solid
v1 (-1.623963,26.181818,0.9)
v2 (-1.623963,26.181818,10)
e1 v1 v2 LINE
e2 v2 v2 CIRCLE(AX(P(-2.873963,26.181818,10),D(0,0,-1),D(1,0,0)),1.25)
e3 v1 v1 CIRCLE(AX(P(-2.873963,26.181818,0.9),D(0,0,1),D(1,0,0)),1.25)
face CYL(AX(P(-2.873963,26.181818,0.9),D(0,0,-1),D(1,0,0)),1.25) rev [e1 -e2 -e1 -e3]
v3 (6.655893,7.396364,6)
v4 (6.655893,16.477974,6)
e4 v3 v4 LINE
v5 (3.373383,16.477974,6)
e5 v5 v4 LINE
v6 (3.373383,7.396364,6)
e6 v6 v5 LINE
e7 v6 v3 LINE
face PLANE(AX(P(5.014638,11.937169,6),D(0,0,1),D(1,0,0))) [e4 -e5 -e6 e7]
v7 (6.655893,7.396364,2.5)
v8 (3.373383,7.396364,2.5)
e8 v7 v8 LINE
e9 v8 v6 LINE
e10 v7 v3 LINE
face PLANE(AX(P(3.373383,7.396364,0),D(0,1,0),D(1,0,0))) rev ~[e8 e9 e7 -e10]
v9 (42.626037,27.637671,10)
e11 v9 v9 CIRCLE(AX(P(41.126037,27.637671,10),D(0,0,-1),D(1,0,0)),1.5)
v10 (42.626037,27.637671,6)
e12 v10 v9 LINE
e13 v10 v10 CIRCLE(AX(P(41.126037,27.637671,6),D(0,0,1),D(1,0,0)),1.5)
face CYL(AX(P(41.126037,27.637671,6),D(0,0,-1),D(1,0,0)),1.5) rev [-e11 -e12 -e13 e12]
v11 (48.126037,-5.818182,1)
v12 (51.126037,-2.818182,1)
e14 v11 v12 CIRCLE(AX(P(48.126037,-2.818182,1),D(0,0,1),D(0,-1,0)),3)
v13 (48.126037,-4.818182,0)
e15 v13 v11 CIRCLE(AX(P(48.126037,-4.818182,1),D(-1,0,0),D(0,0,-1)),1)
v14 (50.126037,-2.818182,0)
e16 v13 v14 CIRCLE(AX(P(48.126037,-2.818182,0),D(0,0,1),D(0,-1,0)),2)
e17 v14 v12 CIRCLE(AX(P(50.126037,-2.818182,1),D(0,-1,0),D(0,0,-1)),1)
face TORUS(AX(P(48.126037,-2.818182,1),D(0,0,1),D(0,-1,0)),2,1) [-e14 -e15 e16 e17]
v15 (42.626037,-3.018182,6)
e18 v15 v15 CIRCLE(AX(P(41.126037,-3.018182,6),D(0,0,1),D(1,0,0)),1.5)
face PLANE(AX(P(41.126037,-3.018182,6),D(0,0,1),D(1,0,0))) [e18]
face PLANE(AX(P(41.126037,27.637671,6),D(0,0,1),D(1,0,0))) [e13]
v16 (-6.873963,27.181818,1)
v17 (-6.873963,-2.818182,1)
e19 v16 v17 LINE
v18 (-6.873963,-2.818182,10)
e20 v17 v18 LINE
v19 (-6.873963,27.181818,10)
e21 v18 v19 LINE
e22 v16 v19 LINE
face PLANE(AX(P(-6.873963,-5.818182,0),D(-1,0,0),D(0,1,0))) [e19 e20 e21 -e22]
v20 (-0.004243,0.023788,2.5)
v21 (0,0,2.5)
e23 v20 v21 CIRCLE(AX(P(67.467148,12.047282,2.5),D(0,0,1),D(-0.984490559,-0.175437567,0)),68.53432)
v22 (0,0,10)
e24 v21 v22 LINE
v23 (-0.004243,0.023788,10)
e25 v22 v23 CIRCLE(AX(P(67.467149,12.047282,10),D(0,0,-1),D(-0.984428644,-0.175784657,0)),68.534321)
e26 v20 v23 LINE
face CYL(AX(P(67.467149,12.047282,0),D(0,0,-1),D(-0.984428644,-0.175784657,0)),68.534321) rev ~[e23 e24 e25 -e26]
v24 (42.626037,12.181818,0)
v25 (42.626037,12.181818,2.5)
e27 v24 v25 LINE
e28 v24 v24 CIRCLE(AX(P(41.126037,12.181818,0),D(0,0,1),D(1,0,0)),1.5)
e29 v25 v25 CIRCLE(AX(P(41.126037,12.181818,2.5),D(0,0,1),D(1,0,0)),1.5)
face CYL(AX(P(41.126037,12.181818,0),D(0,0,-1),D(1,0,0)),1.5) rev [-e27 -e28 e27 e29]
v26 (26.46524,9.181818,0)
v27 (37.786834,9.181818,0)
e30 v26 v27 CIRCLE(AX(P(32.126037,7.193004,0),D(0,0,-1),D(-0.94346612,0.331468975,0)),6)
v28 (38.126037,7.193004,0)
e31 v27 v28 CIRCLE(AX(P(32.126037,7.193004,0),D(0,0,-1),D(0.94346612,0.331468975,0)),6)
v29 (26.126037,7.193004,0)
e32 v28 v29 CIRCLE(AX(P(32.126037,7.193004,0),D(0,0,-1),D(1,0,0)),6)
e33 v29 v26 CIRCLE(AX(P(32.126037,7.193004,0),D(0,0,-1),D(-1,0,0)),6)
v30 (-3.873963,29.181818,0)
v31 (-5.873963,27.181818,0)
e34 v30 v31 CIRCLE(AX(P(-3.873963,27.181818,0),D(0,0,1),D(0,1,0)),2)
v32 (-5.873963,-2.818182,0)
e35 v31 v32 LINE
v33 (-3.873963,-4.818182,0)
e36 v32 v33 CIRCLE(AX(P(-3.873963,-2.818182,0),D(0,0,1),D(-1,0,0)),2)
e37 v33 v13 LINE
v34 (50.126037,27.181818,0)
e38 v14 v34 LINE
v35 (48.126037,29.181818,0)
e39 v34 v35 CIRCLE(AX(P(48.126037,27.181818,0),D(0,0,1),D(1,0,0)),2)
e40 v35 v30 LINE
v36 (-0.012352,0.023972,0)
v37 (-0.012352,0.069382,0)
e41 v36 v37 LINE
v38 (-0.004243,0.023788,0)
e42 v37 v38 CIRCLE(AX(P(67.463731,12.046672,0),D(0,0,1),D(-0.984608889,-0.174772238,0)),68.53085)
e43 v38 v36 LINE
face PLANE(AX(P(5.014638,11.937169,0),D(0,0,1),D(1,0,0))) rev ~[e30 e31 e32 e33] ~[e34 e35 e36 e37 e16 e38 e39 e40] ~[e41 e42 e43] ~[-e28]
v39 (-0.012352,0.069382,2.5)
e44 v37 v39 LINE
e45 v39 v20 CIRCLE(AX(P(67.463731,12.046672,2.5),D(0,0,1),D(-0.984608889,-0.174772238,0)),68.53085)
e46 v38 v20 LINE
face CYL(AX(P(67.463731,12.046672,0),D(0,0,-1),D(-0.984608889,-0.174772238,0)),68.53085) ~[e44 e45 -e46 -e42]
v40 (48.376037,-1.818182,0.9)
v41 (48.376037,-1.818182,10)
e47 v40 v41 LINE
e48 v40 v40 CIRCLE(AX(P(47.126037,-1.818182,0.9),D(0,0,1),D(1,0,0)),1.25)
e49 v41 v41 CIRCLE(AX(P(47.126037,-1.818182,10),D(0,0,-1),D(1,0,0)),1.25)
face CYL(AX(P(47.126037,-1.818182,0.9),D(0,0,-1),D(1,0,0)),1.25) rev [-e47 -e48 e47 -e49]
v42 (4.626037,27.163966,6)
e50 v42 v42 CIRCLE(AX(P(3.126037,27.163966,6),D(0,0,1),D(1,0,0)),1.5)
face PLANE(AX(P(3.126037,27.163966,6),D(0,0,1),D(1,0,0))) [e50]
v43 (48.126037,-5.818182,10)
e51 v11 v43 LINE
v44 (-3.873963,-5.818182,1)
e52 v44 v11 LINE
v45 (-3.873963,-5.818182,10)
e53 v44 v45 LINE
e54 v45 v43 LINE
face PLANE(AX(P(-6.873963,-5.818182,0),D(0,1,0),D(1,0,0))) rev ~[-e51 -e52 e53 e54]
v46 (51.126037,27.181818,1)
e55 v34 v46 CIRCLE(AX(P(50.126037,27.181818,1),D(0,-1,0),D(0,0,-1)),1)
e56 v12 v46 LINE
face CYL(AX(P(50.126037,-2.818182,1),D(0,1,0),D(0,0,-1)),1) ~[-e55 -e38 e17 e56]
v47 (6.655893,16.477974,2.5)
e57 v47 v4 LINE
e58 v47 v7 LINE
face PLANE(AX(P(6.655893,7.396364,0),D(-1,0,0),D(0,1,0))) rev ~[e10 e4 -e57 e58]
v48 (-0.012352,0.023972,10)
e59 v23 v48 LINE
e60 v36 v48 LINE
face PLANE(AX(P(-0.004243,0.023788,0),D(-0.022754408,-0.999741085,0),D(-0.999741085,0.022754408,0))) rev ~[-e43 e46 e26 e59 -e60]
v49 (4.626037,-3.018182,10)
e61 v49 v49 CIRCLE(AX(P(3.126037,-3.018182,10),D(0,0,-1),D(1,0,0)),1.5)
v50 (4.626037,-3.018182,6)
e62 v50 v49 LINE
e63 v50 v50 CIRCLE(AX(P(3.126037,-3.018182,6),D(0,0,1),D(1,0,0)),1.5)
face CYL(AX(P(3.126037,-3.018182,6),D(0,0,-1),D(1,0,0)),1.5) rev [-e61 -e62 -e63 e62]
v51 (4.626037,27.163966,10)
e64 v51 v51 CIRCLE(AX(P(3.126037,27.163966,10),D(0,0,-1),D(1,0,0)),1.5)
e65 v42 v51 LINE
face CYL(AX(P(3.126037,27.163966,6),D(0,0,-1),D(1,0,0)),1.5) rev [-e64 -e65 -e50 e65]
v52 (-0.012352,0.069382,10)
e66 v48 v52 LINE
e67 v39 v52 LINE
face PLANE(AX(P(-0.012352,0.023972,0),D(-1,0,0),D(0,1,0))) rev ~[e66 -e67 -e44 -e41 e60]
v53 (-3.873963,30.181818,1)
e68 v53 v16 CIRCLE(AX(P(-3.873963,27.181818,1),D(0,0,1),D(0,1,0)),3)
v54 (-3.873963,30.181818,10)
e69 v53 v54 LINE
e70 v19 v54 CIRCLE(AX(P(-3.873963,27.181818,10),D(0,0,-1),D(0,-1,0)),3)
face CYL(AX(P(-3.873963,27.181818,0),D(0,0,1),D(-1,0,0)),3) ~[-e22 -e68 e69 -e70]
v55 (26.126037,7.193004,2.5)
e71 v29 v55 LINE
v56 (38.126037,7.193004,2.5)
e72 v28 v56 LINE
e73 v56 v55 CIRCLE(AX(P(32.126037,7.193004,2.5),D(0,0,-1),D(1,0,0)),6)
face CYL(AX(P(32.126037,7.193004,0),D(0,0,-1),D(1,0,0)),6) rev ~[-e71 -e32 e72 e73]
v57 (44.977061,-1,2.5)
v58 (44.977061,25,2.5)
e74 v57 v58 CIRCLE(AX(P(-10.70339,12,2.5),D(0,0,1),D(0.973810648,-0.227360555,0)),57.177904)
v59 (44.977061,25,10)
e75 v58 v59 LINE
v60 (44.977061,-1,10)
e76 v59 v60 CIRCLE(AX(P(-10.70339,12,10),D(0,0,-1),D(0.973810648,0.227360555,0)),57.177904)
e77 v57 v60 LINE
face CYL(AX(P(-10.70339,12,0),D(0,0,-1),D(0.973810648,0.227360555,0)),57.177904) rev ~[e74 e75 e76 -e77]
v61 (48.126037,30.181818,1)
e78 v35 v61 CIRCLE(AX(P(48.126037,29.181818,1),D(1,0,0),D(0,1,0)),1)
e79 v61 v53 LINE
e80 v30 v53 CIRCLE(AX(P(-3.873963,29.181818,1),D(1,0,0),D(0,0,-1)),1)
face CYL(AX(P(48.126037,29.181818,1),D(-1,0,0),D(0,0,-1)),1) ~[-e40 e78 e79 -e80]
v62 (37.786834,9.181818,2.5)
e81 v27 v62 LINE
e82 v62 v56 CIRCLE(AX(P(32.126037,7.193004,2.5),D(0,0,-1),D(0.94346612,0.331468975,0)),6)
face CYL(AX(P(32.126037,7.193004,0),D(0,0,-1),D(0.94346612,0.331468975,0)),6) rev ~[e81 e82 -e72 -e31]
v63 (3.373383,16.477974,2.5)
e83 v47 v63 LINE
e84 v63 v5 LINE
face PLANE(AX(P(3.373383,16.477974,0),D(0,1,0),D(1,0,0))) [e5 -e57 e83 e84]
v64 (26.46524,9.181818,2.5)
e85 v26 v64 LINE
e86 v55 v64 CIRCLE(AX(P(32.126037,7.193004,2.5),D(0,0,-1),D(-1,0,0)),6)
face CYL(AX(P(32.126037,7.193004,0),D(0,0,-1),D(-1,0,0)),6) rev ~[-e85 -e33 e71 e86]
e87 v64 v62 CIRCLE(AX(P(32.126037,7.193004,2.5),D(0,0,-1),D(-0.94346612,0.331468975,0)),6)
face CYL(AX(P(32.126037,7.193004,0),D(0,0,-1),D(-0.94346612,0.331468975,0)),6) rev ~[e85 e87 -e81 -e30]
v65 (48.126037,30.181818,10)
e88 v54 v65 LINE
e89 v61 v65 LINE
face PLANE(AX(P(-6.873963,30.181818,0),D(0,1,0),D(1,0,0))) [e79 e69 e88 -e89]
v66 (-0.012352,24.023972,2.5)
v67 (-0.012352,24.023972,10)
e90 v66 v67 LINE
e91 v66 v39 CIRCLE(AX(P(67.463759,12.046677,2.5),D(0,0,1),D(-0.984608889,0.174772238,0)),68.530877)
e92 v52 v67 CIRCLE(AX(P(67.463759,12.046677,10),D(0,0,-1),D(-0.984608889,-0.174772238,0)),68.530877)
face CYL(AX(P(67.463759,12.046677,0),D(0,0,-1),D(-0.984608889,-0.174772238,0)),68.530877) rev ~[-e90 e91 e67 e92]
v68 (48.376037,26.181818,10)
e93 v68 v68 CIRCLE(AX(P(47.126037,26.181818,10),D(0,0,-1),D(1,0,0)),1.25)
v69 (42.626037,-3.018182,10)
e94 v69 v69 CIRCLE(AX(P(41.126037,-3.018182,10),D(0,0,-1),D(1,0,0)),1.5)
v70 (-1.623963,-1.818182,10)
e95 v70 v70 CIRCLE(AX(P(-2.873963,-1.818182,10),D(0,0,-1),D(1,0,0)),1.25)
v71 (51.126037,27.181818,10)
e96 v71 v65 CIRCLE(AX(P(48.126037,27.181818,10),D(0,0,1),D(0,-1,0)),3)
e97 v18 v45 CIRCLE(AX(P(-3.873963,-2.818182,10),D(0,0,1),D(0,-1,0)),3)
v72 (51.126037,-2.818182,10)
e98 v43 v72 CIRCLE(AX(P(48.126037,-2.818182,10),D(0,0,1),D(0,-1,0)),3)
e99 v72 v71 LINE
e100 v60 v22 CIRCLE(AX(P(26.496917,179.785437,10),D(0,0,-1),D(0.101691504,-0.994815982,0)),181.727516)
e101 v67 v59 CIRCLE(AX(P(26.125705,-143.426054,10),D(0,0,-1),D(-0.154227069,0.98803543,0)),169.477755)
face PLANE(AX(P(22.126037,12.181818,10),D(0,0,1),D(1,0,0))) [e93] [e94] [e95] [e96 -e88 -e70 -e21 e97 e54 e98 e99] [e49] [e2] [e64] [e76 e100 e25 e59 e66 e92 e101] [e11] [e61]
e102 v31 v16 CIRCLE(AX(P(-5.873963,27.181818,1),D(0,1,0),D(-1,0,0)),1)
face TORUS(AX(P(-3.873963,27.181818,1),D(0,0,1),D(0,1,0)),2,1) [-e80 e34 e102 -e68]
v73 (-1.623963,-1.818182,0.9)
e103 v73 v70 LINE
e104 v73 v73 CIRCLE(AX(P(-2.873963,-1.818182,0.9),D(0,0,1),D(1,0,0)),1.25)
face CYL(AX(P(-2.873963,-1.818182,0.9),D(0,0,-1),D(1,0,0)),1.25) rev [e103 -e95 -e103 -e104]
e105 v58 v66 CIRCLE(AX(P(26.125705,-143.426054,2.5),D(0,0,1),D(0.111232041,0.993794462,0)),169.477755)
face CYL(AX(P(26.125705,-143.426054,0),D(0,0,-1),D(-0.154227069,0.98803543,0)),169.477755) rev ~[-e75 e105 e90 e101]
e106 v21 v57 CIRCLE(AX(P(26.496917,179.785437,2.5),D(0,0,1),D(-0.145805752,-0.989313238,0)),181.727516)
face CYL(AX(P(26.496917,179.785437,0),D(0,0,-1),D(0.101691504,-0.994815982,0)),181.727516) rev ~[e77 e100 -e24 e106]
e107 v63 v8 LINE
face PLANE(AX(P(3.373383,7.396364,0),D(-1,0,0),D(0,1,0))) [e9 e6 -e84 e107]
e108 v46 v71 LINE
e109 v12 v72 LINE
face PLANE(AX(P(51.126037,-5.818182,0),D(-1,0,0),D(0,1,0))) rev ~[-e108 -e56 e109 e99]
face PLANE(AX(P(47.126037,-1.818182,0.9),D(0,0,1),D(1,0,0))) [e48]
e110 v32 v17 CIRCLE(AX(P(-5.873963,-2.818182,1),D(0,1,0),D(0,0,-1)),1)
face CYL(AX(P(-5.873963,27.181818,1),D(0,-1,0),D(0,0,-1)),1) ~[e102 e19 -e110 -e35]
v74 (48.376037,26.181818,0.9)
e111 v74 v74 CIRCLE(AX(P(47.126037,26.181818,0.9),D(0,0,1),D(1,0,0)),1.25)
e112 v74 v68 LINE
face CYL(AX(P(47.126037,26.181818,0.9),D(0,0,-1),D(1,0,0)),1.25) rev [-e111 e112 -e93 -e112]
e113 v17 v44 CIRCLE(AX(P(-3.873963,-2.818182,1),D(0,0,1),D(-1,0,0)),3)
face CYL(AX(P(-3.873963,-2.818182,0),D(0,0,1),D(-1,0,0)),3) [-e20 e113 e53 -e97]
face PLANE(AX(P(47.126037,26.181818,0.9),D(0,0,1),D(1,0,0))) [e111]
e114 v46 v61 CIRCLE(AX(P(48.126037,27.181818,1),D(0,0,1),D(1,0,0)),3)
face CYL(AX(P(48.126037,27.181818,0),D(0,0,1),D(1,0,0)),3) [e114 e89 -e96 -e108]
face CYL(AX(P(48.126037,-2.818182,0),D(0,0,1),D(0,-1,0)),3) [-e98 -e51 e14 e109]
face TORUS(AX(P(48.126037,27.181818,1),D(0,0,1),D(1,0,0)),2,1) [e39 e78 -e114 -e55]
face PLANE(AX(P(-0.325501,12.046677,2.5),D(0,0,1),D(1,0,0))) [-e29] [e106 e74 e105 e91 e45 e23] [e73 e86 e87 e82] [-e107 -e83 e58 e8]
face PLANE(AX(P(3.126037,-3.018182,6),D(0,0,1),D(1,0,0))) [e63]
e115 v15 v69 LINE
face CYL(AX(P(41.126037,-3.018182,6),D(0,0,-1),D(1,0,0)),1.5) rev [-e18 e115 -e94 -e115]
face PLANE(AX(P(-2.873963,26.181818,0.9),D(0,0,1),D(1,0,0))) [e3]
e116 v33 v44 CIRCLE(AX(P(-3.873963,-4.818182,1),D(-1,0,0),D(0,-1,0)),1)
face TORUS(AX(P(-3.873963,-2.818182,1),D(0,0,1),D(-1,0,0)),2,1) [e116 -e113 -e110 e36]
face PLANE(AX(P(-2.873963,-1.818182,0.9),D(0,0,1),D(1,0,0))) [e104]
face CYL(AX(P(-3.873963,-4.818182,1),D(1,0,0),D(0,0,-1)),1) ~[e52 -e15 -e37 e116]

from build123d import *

# Parameters (mm, degrees)
F0_W     = 58
F0_H     = 36
F0_R     = 1.25
F0_R_2   = 1.5
F1_DEPTH = 10
F0_R_3   = 1
F0_W_2   = 3.2825097442
F0_H_2   = 9.0816104785
F2_DEPTH = 2.5
F3_R     = 3
F4_DEPTH = 6
F5_START = 0.9
F5_DEPTH = 16.2
F6_START = 6
F6_DEPTH = 10.7
F7_R     = 1


with BuildPart() as f1:
    # F0 (on Top) → F1 (new body)
    with BuildSketch(Plane.XY):
        with Locations((22.1260370687, 12.181818096)):
            Rectangle(F0_W, F0_H)
        with Locations((-2.8739629313, -1.818181904)):
            Circle(F0_R, mode=Mode.SUBTRACT)
        with Locations((3.1260370687, -3.018181904)):
            Circle(F0_R_2, mode=Mode.SUBTRACT)
        with Locations((41.1260370687, -3.018181904)):
            Circle(F0_R_2, mode=Mode.SUBTRACT)
        with Locations((47.1260370687, -1.818181904)):
            Circle(F0_R, mode=Mode.SUBTRACT)
        with BuildLine():
            Line((-0.0042433119, 0.0237876128), (-0.0123524841, 0.02397218))
            Line((-0.0123524841, 0.02397218), (-0.0123524841, 0.0693824727))
            ThreePointArc((-0.0123524841, 0.0693824727), (-1.0671188126, 12.0466773263), (-0.0123524841, 24.02397218))
            ThreePointArc((-0.0123524841, 24.02397218), (22.4498159336, 26.0118318189), (44.9770614896, 25))
            ThreePointArc((44.9770614896, 25), (46.474513746, 12), (44.9770614896, -1))
            ThreePointArc((44.9770614896, -1), (22.4574664967, -1.8971785964), (0, 0))
            ThreePointArc((0, 0), (-0.0021227043, 0.0118936194), (-0.0042433119, 0.0237876128))
        make_face(mode=Mode.SUBTRACT)
        with Locations((-2.8739629313, 26.181818096)):
            Circle(F0_R, mode=Mode.SUBTRACT)
        with Locations((3.1260370687, 27.16396598)):
            Circle(F0_R_2, mode=Mode.SUBTRACT)
        with Locations((41.1260370687, 27.6376707083)):
            Circle(F0_R_2, mode=Mode.SUBTRACT)
        with Locations((47.1260370687, 26.181818096)):
            Circle(F0_R, mode=Mode.SUBTRACT)
        with Locations((-2.8739629313, 26.181818096)):
            Circle(F0_R)
        with Locations((47.1260370687, 26.181818096)):
            Circle(F0_R)
        with Locations((47.1260370687, -1.818181904)):
            Circle(F0_R)
        with Locations((-2.8739629313, -1.818181904)):
            Circle(F0_R)
        with Locations((3.1260370687, -3.018181904)):
            Circle(F0_R_2)
        with Locations((3.1260370687, 27.16396598)):
            Circle(F0_R_2)
        with Locations((41.1260370687, 27.6376707083)):
            Circle(F0_R_2)
        with Locations((41.1260370687, -3.018181904)):
            Circle(F0_R_2)
    extrude(amount=F1_DEPTH)

    # F0 (on Top) → F2 (join)
    with BuildSketch(Plane.XY):
        with BuildLine():
            ThreePointArc((-0.0123524841, 24.02397218), (-1.0671188126, 12.0466773263), (-0.0123524841, 0.0693824727))
            Line((-0.0123524841, 0.0693824727), (-0.0123524841, 24.02397218))
        make_face()
        with BuildLine():
            Line((-0.0123524841, 24.02397218), (-0.0123524841, 0.0693824727))
            ThreePointArc((-0.0123524841, 0.0693824727), (-0.0083017494, 0.0465843578), (-0.0042433119, 0.0237876128))
            Line((-0.0042433119, 0.0237876128), (44.9770614896, -1))
            Line((44.9770614896, -1), (44.9770614896, 25))
            Line((44.9770614896, 25), (-0.0123524841, 24.02397218))
        make_face()
        with Locations((2.9621722015, 2.0848012064)):
            Circle(F0_R_3, mode=Mode.SUBTRACT)
        with Locations((5.0146379508, 11.9371688925)):
            Rectangle(F0_W_2, F0_H_2, mode=Mode.SUBTRACT)
        with Locations((41.7125664489, 2.0848012064)):
            Circle(F0_R_3, mode=Mode.SUBTRACT)
        with BuildLine():
            Line((26.1260370687, 7.1930042468), (26.1260370687, 9.181818096))
            Line((26.1260370687, 9.181818096), (26.4652403515, 9.181818096))
            ThreePointArc((26.4652403515, 9.181818096), (32.1260370687, 13.1930042468), (37.7868337859, 9.181818096))
            Line((37.7868337859, 9.181818096), (38.1260370687, 9.181818096))
            Line((38.1260370687, 9.181818096), (38.1260370687, 7.1930042468))
            Line((38.1260370687, 7.1930042468), (38.1260370687, 1.181818096))
            Line((38.1260370687, 1.181818096), (26.1260370687, 1.181818096))
            Line((26.1260370687, 1.181818096), (26.1260370687, 7.1930042468))
        make_face(mode=Mode.SUBTRACT)
        with Locations((41.1260370687, 12.181818096)):
            Circle(F0_R_2, mode=Mode.SUBTRACT)
        with Locations((18.8074270263, 12.2937392443)):
            Circle(F0_R_3, mode=Mode.SUBTRACT)
        with Locations((2.9621722015, 21.6664075851)):
            Circle(F0_R_3, mode=Mode.SUBTRACT)
        with Locations((26.8074270263, 12.2937392443)):
            Circle(F0_R_3, mode=Mode.SUBTRACT)
        with Locations((41.7125664489, 21.6664075851)):
            Circle(F0_R_3, mode=Mode.SUBTRACT)
        with BuildLine():
            Line((44.9770614896, -1), (-0.0042433119, 0.0237876128))
            ThreePointArc((-0.0042433119, 0.0237876128), (-0.0021227043, 0.0118936194), (0, 0))
            ThreePointArc((0, 0), (22.4574664967, -1.8971785964), (44.9770614896, -1))
        make_face()
        with BuildLine():
            ThreePointArc((44.9770614896, 25), (22.4498159336, 26.0118318189), (-0.0123524841, 24.02397218))
            Line((-0.0123524841, 24.02397218), (44.9770614896, 25))
        make_face()
        with BuildLine():
            Line((44.9770614896, 25), (44.9770614896, -1))
            ThreePointArc((44.9770614896, -1), (46.474513746, 12), (44.9770614896, 25))
        make_face()
        with Locations((2.9621722015, 21.6664075851)):
            Circle(F0_R_3)
        with Locations((2.9621722015, 2.0848012064)):
            Circle(F0_R_3)
        with Locations((41.7125664489, 2.0848012064)):
            Circle(F0_R_3)
        with Locations((41.7125664489, 21.6664075851)):
            Circle(F0_R_3)
        with Locations((18.8074270263, 12.2937392443)):
            Circle(F0_R_3)
        with Locations((26.8074270263, 12.2937392443)):
            Circle(F0_R_3)
        with Locations((5.0146379508, 11.9371688925)):
            Rectangle(F0_W_2, F0_H_2)
        with BuildLine():
            Line((26.4652403515, 9.181818096), (26.1260370687, 9.181818096))
            Line((26.1260370687, 9.181818096), (26.1260370687, 7.1930042468))
            ThreePointArc((26.1260370687, 7.1930042468), (26.2114457767, 8.2017707453), (26.4652403515, 9.181818096))
        make_face()
        with BuildLine():
            ThreePointArc((38.1260370687, 7.1930042468), (32.1260370687, 1.1930042468), (26.1260370687, 7.1930042468))
            Line((26.1260370687, 7.1930042468), (26.1260370687, 1.181818096))
            Line((26.1260370687, 1.181818096), (38.1260370687, 1.181818096))
            Line((38.1260370687, 1.181818096), (38.1260370687, 7.1930042468))
        make_face()
        with BuildLine():
            Line((38.1260370687, 9.181818096), (37.7868337859, 9.181818096))
            ThreePointArc((37.7868337859, 9.181818096), (38.0406283607, 8.2017707453), (38.1260370687, 7.1930042468))
            Line((38.1260370687, 7.1930042468), (38.1260370687, 9.181818096))
        make_face()
    extrude(amount=F2_DEPTH)

    # F3
    f3_edges = [f1.edges().sort_by_distance(p)[0] for p in [
        (51.126037, 30.181818, 5),
        (51.126037, -5.818182, 5),
        (-6.873963, -5.818182, 5),
        (-6.873963, 30.181818, 5),
    ]]
    fillet(f3_edges, radius=F3_R)

    # F0 (on Top) → F4 (join)
    with BuildSketch(Plane.XY):
        with Locations((5.0146379508, 11.9371688925)):
            Rectangle(F0_W_2, F0_H_2)
    extrude(amount=F4_DEPTH)

    # F0 (on Top) → F5 (cut)
    with BuildSketch(Plane.XY.offset(F5_START)):
        with Locations((47.1260370687, 26.181818096)):
            Circle(F0_R)
        with Locations((-2.8739629313, 26.181818096)):
            Circle(F0_R)
        with Locations((-2.8739629313, -1.818181904)):
            Circle(F0_R)
        with Locations((47.1260370687, -1.818181904)):
            Circle(F0_R)
    extrude(amount=F5_DEPTH, mode=Mode.SUBTRACT)

    # F0 (on Top) → F6 (cut)
    with BuildSketch(Plane.XY.offset(F6_START)):
        with Locations((3.1260370687, 27.16396598)):
            Circle(F0_R_2)
        with Locations((41.1260370687, 27.6376707083)):
            Circle(F0_R_2)
        with Locations((41.1260370687, -3.018181904)):
            Circle(F0_R_2)
        with Locations((3.1260370687, -3.018181904)):
            Circle(F0_R_2)
    extrude(amount=F6_DEPTH, mode=Mode.SUBTRACT)

    # F7
    f7_edges = [f1.edges().sort_by_distance(p)[0] for p in [
        (51.126037, 12.181818, 0),
        (22.126037, -5.818182, 0),
        (50.247357, -4.939502, 0),
        (50.247357, 29.303138, 0),
        (22.126037, 30.181818, 0),
        (-5.995283, 29.303138, 0),
        (-6.873963, 12.181818, 0),
        (-5.995283, -4.939502, 0),
    ]]
    fillet(f7_edges, radius=F7_R)


solid = f1.part
